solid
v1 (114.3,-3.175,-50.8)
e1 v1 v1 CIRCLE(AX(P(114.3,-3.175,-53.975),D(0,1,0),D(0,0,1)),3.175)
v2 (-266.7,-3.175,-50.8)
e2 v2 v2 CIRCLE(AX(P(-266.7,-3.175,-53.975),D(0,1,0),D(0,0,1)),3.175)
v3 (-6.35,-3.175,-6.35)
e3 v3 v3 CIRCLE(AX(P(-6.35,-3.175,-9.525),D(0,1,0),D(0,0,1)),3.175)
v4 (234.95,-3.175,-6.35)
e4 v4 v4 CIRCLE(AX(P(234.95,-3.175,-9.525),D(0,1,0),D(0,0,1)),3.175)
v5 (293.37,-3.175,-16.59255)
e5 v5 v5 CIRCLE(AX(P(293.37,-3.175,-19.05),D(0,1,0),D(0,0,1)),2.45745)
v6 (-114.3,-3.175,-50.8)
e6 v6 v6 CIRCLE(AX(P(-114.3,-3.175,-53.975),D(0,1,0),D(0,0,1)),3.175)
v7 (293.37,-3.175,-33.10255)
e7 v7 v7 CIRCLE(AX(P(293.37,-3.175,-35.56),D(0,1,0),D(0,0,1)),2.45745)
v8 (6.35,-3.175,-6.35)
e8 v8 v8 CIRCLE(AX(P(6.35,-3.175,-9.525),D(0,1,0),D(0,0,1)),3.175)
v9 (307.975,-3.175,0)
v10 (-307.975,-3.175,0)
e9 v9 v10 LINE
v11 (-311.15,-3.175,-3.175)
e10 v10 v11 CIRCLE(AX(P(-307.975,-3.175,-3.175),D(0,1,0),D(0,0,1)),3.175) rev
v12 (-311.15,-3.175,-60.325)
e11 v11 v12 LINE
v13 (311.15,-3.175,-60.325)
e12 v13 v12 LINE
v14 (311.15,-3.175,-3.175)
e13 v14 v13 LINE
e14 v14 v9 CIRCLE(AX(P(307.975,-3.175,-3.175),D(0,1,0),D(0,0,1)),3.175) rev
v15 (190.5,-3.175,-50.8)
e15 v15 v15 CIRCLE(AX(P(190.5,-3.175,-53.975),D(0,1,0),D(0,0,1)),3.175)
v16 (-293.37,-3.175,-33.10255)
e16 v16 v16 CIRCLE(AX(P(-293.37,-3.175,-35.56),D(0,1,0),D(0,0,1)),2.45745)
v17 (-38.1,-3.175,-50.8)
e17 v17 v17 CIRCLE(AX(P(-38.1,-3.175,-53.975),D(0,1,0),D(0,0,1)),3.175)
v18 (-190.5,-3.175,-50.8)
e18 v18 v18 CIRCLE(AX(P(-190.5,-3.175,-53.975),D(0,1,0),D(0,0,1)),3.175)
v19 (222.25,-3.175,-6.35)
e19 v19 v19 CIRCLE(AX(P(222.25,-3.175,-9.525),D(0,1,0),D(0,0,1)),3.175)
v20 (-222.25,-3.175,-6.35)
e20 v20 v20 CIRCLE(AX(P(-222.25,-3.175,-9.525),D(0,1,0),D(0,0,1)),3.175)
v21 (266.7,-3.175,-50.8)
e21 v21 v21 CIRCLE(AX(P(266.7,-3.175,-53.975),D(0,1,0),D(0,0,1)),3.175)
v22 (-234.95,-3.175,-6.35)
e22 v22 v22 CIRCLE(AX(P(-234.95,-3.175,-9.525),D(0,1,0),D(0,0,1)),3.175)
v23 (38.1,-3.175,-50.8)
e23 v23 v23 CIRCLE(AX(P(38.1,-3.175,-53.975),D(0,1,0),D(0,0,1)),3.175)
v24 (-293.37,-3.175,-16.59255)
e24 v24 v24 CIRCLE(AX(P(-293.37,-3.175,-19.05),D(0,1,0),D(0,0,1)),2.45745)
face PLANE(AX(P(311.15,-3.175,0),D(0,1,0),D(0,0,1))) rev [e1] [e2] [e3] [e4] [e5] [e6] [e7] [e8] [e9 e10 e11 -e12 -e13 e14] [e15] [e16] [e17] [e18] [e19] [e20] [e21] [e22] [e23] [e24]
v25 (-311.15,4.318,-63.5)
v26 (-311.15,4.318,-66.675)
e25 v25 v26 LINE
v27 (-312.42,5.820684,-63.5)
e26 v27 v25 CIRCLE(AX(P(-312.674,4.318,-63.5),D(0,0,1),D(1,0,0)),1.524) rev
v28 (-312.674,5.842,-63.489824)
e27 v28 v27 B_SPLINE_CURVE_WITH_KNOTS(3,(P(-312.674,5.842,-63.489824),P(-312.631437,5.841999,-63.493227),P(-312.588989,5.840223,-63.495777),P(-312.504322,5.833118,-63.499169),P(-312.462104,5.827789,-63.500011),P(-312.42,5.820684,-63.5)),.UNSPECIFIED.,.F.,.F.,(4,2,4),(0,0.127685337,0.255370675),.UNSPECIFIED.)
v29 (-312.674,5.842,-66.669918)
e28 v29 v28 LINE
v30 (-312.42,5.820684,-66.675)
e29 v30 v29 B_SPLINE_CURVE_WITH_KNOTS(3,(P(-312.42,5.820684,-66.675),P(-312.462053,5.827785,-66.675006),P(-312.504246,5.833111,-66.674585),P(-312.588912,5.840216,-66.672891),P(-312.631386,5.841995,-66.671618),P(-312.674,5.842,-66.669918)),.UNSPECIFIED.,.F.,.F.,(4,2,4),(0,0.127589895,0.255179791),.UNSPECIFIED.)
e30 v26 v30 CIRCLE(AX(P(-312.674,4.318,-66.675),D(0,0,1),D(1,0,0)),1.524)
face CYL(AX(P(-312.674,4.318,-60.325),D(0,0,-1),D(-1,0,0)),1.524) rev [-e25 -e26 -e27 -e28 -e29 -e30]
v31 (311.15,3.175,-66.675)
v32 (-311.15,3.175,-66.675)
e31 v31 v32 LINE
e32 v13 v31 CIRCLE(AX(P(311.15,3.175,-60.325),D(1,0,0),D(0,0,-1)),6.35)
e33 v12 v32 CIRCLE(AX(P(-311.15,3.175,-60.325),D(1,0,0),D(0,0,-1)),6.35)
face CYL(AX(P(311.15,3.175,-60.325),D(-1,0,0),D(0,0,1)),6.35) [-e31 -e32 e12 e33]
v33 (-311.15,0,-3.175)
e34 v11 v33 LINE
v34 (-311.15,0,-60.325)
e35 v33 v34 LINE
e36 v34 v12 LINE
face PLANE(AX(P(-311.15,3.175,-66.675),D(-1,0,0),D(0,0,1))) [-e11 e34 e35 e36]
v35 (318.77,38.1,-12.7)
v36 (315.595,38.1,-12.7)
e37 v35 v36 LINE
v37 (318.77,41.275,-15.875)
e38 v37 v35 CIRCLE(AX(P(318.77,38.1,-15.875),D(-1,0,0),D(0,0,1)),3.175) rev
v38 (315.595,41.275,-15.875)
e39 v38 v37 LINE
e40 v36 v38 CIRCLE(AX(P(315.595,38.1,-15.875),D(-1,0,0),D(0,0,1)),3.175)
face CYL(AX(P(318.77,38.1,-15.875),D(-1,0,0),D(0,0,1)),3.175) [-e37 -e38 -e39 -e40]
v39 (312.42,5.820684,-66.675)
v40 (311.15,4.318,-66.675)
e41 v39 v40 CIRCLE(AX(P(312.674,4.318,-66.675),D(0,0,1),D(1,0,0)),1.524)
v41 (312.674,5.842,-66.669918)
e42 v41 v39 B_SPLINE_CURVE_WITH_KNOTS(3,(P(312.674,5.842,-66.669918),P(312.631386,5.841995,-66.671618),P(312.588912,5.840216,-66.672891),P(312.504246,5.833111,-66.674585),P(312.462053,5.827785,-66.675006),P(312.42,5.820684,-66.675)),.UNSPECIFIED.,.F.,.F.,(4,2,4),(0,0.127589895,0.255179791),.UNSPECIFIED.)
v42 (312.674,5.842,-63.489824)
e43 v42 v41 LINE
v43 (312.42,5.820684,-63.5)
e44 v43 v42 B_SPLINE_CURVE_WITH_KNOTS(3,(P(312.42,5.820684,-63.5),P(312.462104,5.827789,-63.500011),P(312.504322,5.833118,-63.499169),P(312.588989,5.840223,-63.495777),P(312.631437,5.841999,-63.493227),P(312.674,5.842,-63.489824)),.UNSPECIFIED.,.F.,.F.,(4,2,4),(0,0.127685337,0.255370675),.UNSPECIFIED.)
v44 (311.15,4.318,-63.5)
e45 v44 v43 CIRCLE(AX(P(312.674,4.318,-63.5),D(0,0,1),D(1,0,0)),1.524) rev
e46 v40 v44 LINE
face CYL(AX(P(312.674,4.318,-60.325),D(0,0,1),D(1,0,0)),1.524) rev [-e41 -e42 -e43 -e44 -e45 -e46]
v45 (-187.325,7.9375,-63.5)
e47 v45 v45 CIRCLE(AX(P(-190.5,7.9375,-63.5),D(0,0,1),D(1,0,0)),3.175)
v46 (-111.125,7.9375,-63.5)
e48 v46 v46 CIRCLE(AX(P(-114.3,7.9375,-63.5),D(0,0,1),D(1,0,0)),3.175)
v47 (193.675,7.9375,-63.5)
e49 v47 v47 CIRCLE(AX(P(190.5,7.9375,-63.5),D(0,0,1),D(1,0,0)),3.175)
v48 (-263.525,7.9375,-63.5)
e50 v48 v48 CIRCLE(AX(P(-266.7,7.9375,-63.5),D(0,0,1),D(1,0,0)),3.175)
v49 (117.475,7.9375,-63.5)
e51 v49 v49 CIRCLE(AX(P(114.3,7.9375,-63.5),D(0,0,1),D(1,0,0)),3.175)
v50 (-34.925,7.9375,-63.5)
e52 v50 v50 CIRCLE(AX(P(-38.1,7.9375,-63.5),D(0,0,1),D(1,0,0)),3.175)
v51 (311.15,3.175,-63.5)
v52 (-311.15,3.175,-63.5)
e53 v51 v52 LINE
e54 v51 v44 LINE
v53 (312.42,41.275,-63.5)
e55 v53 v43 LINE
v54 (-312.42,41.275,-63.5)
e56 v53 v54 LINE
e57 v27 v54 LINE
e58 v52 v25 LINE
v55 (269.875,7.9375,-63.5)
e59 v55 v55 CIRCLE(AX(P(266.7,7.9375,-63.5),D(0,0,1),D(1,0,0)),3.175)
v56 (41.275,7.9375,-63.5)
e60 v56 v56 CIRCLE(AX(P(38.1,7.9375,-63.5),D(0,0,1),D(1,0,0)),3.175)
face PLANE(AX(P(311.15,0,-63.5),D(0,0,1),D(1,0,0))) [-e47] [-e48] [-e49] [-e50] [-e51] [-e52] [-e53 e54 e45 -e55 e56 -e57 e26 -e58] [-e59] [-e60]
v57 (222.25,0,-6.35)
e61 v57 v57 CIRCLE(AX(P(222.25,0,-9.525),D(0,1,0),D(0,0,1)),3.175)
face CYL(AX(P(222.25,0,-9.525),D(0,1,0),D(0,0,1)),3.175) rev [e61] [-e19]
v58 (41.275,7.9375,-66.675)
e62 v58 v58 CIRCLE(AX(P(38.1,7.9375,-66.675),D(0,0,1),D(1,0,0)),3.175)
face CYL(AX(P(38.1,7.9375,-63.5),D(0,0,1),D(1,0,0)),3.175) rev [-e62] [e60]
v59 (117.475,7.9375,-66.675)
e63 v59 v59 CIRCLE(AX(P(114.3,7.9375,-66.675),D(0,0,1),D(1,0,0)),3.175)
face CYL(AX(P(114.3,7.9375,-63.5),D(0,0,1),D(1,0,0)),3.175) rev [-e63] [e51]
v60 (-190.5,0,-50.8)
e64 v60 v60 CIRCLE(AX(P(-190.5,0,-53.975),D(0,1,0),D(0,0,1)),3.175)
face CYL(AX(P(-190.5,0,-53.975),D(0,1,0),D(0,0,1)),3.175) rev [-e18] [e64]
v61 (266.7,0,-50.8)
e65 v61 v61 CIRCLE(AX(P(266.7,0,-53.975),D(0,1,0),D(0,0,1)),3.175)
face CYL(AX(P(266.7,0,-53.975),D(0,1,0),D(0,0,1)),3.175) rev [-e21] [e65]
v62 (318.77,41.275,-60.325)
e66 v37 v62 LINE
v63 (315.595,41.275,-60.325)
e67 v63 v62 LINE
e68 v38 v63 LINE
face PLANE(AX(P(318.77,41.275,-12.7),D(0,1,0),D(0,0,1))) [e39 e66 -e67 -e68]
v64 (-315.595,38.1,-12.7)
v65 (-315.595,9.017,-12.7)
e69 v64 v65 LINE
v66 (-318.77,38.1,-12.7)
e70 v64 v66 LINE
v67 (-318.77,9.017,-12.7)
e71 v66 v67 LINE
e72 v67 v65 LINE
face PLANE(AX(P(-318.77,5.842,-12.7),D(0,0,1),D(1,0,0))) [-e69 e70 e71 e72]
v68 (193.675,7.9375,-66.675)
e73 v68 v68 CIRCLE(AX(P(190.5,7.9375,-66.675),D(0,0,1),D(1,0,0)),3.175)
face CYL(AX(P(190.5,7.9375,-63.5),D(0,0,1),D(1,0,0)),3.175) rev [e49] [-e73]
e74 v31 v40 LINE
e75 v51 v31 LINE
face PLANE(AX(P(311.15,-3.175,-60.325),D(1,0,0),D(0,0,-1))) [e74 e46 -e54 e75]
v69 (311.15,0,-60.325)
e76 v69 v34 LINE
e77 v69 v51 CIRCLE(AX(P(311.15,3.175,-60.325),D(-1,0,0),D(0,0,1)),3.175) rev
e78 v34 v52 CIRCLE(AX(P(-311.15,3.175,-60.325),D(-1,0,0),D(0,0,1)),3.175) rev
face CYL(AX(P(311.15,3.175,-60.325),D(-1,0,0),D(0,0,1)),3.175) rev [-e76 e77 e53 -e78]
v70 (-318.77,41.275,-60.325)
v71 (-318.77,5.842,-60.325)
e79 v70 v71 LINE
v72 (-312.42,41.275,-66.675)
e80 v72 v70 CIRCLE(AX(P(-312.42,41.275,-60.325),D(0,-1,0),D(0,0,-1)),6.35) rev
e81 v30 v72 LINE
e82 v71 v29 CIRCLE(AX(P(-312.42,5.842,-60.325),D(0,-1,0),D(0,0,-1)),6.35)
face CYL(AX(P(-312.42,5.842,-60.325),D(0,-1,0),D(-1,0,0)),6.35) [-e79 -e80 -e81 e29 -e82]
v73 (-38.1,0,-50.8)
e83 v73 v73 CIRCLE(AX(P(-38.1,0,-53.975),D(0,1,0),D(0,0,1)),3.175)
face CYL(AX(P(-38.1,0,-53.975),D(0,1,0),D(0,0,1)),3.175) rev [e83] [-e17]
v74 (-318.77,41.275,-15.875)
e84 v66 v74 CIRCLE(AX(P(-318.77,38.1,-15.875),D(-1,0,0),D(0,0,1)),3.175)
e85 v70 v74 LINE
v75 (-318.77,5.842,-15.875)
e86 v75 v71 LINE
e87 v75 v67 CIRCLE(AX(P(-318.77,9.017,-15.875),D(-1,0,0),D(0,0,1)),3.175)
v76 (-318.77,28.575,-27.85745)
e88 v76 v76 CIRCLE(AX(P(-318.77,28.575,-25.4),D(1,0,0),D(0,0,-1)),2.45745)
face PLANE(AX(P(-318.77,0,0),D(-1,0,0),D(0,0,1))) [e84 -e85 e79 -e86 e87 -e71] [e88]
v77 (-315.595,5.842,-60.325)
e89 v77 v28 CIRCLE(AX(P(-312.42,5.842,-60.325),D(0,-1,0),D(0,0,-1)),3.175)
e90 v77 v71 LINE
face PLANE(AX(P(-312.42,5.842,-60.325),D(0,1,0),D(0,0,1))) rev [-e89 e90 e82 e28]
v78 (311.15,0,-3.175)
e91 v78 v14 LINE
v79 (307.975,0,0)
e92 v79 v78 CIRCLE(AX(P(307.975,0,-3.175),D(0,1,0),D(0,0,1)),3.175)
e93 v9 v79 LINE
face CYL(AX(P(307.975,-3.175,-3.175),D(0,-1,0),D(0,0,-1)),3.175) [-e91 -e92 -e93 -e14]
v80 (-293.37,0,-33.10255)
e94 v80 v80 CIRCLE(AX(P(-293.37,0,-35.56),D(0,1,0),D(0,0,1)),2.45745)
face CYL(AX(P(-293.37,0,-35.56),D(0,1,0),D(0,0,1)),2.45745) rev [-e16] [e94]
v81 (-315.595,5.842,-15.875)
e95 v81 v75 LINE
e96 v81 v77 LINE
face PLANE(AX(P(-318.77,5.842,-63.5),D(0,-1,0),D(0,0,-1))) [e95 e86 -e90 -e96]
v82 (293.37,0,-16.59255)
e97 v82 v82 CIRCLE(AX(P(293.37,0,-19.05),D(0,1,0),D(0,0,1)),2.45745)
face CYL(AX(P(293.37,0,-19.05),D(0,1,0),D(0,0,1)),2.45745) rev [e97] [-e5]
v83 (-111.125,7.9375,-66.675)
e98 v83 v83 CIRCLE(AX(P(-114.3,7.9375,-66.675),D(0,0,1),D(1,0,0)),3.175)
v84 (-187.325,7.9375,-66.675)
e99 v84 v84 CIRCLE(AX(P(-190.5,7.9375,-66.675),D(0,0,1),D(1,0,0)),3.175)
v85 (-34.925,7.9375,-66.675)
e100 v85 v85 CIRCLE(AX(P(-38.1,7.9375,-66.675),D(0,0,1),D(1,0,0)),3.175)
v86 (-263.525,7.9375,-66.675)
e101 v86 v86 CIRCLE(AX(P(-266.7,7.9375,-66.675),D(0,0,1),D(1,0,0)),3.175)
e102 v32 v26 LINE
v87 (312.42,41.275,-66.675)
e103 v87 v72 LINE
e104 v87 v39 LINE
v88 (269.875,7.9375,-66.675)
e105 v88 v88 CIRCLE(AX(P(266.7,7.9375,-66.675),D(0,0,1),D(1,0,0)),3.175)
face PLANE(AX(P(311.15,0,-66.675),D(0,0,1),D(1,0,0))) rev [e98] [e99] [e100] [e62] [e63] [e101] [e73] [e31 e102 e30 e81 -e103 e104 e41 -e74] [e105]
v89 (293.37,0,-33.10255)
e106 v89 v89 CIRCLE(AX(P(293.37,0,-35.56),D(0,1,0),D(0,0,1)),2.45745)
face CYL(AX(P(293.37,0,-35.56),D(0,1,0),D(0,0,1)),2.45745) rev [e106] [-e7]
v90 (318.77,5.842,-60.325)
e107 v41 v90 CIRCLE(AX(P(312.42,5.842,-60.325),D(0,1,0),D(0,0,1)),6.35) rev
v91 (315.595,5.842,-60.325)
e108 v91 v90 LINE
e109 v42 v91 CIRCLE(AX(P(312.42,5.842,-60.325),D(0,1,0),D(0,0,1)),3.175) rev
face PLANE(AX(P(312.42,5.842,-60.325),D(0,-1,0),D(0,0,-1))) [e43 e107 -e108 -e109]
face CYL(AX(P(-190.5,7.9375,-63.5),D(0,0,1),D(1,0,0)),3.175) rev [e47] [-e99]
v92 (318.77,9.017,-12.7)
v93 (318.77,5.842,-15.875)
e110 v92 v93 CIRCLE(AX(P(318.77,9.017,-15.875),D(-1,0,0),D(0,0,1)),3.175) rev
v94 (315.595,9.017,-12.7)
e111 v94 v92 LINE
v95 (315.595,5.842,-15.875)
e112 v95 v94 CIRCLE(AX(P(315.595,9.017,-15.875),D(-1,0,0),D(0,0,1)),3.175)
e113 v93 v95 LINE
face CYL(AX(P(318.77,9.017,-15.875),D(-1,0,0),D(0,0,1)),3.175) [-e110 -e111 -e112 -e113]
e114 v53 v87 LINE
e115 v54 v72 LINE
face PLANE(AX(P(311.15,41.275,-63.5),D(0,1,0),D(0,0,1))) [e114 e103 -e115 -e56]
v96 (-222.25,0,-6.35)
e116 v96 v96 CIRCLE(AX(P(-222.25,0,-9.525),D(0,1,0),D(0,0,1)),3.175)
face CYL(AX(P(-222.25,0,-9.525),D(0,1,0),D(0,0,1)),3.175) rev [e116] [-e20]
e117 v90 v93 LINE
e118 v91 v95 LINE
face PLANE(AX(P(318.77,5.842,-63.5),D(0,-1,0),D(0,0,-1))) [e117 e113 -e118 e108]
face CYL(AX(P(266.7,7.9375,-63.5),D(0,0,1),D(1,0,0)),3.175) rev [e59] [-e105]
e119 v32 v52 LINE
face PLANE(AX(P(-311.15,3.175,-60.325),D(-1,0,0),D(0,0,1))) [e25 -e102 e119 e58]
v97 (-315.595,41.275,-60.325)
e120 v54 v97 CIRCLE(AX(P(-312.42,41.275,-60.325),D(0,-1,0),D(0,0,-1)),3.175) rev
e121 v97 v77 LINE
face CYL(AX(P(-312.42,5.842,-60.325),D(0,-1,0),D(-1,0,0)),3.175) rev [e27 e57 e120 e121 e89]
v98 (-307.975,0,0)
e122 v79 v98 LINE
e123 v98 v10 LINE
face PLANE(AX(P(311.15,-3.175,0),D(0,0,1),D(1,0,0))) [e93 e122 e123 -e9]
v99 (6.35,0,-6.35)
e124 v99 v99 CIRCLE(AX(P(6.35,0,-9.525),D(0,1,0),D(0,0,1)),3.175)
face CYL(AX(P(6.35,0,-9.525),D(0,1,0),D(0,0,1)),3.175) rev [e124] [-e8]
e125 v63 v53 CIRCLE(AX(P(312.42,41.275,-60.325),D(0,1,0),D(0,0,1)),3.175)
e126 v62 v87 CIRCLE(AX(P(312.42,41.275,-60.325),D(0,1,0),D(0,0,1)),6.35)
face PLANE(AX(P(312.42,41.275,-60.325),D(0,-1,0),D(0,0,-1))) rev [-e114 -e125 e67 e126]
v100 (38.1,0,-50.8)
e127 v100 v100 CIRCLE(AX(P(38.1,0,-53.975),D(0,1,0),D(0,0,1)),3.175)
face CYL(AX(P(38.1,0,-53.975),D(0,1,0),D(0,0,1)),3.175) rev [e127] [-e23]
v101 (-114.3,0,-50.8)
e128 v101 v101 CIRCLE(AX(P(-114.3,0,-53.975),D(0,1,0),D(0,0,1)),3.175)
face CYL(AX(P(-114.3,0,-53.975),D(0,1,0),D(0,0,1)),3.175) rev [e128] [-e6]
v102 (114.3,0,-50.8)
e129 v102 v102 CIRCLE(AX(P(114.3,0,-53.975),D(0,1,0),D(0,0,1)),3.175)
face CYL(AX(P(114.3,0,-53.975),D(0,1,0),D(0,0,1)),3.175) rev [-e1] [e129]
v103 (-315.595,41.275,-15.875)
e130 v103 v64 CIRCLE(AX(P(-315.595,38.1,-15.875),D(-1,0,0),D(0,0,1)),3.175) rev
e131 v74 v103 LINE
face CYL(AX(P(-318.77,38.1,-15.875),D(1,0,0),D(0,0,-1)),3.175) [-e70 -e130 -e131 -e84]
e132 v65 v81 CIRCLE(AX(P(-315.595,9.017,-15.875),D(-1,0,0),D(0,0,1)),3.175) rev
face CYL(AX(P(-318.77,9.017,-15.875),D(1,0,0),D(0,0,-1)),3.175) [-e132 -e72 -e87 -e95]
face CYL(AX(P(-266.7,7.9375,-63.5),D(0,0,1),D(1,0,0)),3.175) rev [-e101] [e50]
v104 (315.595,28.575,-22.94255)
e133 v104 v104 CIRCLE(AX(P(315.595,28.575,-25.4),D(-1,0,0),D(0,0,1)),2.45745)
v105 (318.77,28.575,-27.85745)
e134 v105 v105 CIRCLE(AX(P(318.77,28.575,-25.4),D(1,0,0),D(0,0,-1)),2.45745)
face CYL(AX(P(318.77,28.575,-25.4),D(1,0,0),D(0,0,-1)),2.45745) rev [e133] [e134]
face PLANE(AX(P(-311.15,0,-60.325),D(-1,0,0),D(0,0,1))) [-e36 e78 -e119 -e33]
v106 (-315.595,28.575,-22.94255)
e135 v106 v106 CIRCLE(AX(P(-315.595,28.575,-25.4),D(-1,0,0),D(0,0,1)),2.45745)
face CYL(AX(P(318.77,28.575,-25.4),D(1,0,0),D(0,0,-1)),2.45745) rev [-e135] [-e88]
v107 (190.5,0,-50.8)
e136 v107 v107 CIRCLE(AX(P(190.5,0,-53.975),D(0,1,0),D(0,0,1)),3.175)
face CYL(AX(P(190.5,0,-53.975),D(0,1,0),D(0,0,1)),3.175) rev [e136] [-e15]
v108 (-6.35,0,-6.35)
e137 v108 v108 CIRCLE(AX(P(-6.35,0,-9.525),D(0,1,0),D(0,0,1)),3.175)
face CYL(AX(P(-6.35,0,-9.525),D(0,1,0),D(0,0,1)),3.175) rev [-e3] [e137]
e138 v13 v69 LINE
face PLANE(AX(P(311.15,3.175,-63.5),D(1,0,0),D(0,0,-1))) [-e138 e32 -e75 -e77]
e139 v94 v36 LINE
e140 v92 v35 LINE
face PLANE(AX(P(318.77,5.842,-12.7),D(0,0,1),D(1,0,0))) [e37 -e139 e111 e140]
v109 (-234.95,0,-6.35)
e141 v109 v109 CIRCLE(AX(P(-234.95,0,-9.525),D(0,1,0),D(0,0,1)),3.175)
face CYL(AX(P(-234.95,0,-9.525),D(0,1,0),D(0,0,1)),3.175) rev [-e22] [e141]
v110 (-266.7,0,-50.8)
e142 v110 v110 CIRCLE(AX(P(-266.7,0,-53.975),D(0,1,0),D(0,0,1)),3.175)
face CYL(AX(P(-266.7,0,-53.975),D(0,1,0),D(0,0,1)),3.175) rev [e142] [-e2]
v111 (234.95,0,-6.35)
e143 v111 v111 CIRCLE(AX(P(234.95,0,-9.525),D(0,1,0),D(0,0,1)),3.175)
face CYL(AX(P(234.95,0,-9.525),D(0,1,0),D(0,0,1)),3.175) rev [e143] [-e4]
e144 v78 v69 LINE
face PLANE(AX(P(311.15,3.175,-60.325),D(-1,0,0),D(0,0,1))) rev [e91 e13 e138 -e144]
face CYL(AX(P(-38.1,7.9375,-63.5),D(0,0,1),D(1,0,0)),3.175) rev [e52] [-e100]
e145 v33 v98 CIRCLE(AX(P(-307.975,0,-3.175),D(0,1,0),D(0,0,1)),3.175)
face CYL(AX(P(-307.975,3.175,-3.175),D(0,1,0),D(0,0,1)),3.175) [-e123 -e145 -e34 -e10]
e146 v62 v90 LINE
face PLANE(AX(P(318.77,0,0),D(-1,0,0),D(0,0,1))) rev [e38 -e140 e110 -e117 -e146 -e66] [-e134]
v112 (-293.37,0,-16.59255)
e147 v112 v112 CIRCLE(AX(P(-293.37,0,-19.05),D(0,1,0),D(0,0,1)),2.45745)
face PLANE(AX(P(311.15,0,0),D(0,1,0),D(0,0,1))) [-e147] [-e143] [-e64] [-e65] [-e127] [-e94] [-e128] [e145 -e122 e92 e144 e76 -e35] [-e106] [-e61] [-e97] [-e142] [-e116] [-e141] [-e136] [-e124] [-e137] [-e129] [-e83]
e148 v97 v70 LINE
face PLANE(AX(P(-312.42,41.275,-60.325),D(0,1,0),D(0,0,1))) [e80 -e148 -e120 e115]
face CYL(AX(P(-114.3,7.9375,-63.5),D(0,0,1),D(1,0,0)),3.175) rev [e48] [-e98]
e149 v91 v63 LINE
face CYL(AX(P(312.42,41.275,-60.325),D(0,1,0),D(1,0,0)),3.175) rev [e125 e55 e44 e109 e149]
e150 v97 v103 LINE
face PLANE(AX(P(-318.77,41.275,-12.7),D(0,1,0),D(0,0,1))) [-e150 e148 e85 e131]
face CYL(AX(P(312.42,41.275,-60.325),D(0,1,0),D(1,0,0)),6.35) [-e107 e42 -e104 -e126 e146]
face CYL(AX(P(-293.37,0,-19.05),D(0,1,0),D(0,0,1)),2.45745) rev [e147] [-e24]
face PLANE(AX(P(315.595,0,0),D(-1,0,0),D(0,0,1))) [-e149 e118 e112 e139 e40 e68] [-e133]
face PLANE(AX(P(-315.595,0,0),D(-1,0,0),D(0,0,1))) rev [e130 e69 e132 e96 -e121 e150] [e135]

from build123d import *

# Parameters (mm, degrees)
BASE_FLANGE1_DEPTH           = 311.15
EDGE_FLANGE1_DEPTH           = 35.433
EDGE_FLANGE1_BEND_DEPTH      = 35.433
F_1_4_0_25_DIAMETER_HOLE1_D  = 6.35
F_10_0_1935_DIAMETER_HOLE1_D = 4.9149
FILLET1_R                    = 3.175
F_10_0_1935_DIAMETER_HOLE2_D = 4.9149
FILLET2_R                    = 1.524
F_1_4_0_25_DIAMETER_HOLE2_D  = 6.35
F_1_4_0_25_DIAMETER_HOLE3_D  = 6.35


# Sheet-metal steps are written as plain solids
with BuildPart() as part:
    # Sketch1 → Base-Flange1 (new, symmetric)
    with BuildSketch(Plane(origin=(0, 0, 0), x_dir=(0, 0, -1), z_dir=(1, 0, 0))):
        with BuildLine():
            Line((0, 0), (60.325, 0))
            ThreePointArc((60.325, 0), (62.57006403, 0.92993597), (63.5, 3.175))
            Line((63.5, 3.175), (63.5, 41.275))
            Line((63.5, 41.275), (66.675, 41.275))
            Line((66.675, 41.275), (66.675, 3.175))
            ThreePointArc((66.675, 3.175), (64.815128061, -1.315128061), (60.325, -3.175))
            Line((60.325, -3.175), (0, -3.175))
            Line((0, -3.175), (0, 0))
        make_face()
    extrude(amount=BASE_FLANGE1_DEPTH, both=True)

    # Edge-Flange1 section (across the edge) → Edge-Flange1 (add)
    with BuildSketch(Plane(origin=(-318.77, 41.275, -63.5), x_dir=(1, 0, 0), z_dir=(0, -1, 0))):
        with BuildLine():
            Line((0, 3.175), (0, 50.8))
            Line((0, 50.8), (3.175, 50.8))
            Line((3.175, 50.8), (3.175, 3.175))
            ThreePointArc((3.175, 3.175), (4.10493597, 0.92993597), (6.35, 0))
            Line((6.35, 0), (7.62, 0))
            Line((7.62, 0), (7.62, -3.175))
            Line((7.62, -3.175), (6.35, -3.175))
            ThreePointArc((6.35, -3.175), (1.859871939, -1.315128061), (0, 3.175))
        make_face()
    extrude(amount=EDGE_FLANGE1_DEPTH)

    # Edge-Flange1 section 2 (across the edge) → Edge-Flange1 bend (add)
    with BuildSketch(Plane(origin=(318.77, 5.842, -63.5), x_dir=(-1, 0, 0), z_dir=(0, 1, 0))):
        with BuildLine():
            Line((0, 3.175), (0, 50.8))
            Line((0, 50.8), (3.175, 50.8))
            Line((3.175, 50.8), (3.175, 3.175))
            ThreePointArc((3.175, 3.175), (4.10493597, 0.92993597), (6.35, 0))
            Line((6.35, 0), (7.62, 0))
            Line((7.62, 0), (7.62, -3.175))
            Line((7.62, -3.175), (6.35, -3.175))
            ThreePointArc((6.35, -3.175), (1.859871939, -1.315128061), (0, 3.175))
        make_face()
    extrude(amount=EDGE_FLANGE1_BEND_DEPTH)

    # 1/4 (0.25) Diameter Hole1 (through all)
    with Locations(Plane(origin=(0, 0, 0), x_dir=(1, 0, 0), z_dir=(0, 1, 0))):
        with Locations((-6.35, 9.525), (6.35, 9.525), (222.25, 9.525), (234.95, 9.525), (-222.25, 9.525), (-234.95, 9.525)):
            Hole(F_1_4_0_25_DIAMETER_HOLE1_D / 2)

    # #10 (0.1935) Diameter Hole1 (through all)
    with Locations(Plane(origin=(0, 0, 0), x_dir=(1, 0, 0), z_dir=(0, 1, 0))):
        with Locations((-293.37, 19.05), (-293.37, 35.56), (293.37, 19.05), (293.37, 35.56)):
            Hole(F_10_0_1935_DIAMETER_HOLE1_D / 2)

    # Fillet1
    fillet1_edges = [part.edges().sort_by_distance(p)[0] for p in [
        (311.15, -1.5875, 0),
        (-317.1825, 41.275, -12.7),
        (-317.1825, 5.842, -12.7),
        (317.1825, 5.842, -12.7),
        (317.1825, 41.275, -12.7),
        (-311.15, -1.5875, 0),
    ]]
    fillet(fillet1_edges, radius=FILLET1_R)

    # #10 (0.1935) Diameter Hole2 (through all)
    with Locations(Plane(origin=(318.77, 0, 0), x_dir=(0, 0, -1), z_dir=(1, 0, 0))):
        with Locations((25.4, 28.575)):
            Hole(F_10_0_1935_DIAMETER_HOLE2_D / 2)

    # Fillet2
    fillet2_edges = [part.edges().sort_by_distance(p)[0] for p in [
        (311.15, 5.842, -65.0875),
        (-311.15, 5.842, -65.0875),
    ]]
    fillet(fillet2_edges, radius=FILLET2_R)

    # 1/4 (0.25) Diameter Hole2 (through all)
    with Locations(Plane.XY.offset(-63.5)):
        with Locations((-38.1, 7.9375), (38.1, 7.9375), (114.3, 7.9375), (190.5, 7.9375), (266.7, 7.9375), (-114.3, 7.9375), (-190.5, 7.9375), (-266.7, 7.9375)):
            Hole(F_1_4_0_25_DIAMETER_HOLE2_D / 2)

    # 1/4 (0.25) Diameter Hole3 (through all)
    with Locations(Plane(origin=(0, 0, 0), x_dir=(1, 0, 0), z_dir=(0, 1, 0))):
        with Locations((-266.7, 53.975), (-190.5, 53.975), (-114.3, 53.975), (-38.1, 53.975), (38.1, 53.975), (114.3, 53.975), (190.5, 53.975), (266.7, 53.975)):
            Hole(F_1_4_0_25_DIAMETER_HOLE3_D / 2)


solid = part.part
